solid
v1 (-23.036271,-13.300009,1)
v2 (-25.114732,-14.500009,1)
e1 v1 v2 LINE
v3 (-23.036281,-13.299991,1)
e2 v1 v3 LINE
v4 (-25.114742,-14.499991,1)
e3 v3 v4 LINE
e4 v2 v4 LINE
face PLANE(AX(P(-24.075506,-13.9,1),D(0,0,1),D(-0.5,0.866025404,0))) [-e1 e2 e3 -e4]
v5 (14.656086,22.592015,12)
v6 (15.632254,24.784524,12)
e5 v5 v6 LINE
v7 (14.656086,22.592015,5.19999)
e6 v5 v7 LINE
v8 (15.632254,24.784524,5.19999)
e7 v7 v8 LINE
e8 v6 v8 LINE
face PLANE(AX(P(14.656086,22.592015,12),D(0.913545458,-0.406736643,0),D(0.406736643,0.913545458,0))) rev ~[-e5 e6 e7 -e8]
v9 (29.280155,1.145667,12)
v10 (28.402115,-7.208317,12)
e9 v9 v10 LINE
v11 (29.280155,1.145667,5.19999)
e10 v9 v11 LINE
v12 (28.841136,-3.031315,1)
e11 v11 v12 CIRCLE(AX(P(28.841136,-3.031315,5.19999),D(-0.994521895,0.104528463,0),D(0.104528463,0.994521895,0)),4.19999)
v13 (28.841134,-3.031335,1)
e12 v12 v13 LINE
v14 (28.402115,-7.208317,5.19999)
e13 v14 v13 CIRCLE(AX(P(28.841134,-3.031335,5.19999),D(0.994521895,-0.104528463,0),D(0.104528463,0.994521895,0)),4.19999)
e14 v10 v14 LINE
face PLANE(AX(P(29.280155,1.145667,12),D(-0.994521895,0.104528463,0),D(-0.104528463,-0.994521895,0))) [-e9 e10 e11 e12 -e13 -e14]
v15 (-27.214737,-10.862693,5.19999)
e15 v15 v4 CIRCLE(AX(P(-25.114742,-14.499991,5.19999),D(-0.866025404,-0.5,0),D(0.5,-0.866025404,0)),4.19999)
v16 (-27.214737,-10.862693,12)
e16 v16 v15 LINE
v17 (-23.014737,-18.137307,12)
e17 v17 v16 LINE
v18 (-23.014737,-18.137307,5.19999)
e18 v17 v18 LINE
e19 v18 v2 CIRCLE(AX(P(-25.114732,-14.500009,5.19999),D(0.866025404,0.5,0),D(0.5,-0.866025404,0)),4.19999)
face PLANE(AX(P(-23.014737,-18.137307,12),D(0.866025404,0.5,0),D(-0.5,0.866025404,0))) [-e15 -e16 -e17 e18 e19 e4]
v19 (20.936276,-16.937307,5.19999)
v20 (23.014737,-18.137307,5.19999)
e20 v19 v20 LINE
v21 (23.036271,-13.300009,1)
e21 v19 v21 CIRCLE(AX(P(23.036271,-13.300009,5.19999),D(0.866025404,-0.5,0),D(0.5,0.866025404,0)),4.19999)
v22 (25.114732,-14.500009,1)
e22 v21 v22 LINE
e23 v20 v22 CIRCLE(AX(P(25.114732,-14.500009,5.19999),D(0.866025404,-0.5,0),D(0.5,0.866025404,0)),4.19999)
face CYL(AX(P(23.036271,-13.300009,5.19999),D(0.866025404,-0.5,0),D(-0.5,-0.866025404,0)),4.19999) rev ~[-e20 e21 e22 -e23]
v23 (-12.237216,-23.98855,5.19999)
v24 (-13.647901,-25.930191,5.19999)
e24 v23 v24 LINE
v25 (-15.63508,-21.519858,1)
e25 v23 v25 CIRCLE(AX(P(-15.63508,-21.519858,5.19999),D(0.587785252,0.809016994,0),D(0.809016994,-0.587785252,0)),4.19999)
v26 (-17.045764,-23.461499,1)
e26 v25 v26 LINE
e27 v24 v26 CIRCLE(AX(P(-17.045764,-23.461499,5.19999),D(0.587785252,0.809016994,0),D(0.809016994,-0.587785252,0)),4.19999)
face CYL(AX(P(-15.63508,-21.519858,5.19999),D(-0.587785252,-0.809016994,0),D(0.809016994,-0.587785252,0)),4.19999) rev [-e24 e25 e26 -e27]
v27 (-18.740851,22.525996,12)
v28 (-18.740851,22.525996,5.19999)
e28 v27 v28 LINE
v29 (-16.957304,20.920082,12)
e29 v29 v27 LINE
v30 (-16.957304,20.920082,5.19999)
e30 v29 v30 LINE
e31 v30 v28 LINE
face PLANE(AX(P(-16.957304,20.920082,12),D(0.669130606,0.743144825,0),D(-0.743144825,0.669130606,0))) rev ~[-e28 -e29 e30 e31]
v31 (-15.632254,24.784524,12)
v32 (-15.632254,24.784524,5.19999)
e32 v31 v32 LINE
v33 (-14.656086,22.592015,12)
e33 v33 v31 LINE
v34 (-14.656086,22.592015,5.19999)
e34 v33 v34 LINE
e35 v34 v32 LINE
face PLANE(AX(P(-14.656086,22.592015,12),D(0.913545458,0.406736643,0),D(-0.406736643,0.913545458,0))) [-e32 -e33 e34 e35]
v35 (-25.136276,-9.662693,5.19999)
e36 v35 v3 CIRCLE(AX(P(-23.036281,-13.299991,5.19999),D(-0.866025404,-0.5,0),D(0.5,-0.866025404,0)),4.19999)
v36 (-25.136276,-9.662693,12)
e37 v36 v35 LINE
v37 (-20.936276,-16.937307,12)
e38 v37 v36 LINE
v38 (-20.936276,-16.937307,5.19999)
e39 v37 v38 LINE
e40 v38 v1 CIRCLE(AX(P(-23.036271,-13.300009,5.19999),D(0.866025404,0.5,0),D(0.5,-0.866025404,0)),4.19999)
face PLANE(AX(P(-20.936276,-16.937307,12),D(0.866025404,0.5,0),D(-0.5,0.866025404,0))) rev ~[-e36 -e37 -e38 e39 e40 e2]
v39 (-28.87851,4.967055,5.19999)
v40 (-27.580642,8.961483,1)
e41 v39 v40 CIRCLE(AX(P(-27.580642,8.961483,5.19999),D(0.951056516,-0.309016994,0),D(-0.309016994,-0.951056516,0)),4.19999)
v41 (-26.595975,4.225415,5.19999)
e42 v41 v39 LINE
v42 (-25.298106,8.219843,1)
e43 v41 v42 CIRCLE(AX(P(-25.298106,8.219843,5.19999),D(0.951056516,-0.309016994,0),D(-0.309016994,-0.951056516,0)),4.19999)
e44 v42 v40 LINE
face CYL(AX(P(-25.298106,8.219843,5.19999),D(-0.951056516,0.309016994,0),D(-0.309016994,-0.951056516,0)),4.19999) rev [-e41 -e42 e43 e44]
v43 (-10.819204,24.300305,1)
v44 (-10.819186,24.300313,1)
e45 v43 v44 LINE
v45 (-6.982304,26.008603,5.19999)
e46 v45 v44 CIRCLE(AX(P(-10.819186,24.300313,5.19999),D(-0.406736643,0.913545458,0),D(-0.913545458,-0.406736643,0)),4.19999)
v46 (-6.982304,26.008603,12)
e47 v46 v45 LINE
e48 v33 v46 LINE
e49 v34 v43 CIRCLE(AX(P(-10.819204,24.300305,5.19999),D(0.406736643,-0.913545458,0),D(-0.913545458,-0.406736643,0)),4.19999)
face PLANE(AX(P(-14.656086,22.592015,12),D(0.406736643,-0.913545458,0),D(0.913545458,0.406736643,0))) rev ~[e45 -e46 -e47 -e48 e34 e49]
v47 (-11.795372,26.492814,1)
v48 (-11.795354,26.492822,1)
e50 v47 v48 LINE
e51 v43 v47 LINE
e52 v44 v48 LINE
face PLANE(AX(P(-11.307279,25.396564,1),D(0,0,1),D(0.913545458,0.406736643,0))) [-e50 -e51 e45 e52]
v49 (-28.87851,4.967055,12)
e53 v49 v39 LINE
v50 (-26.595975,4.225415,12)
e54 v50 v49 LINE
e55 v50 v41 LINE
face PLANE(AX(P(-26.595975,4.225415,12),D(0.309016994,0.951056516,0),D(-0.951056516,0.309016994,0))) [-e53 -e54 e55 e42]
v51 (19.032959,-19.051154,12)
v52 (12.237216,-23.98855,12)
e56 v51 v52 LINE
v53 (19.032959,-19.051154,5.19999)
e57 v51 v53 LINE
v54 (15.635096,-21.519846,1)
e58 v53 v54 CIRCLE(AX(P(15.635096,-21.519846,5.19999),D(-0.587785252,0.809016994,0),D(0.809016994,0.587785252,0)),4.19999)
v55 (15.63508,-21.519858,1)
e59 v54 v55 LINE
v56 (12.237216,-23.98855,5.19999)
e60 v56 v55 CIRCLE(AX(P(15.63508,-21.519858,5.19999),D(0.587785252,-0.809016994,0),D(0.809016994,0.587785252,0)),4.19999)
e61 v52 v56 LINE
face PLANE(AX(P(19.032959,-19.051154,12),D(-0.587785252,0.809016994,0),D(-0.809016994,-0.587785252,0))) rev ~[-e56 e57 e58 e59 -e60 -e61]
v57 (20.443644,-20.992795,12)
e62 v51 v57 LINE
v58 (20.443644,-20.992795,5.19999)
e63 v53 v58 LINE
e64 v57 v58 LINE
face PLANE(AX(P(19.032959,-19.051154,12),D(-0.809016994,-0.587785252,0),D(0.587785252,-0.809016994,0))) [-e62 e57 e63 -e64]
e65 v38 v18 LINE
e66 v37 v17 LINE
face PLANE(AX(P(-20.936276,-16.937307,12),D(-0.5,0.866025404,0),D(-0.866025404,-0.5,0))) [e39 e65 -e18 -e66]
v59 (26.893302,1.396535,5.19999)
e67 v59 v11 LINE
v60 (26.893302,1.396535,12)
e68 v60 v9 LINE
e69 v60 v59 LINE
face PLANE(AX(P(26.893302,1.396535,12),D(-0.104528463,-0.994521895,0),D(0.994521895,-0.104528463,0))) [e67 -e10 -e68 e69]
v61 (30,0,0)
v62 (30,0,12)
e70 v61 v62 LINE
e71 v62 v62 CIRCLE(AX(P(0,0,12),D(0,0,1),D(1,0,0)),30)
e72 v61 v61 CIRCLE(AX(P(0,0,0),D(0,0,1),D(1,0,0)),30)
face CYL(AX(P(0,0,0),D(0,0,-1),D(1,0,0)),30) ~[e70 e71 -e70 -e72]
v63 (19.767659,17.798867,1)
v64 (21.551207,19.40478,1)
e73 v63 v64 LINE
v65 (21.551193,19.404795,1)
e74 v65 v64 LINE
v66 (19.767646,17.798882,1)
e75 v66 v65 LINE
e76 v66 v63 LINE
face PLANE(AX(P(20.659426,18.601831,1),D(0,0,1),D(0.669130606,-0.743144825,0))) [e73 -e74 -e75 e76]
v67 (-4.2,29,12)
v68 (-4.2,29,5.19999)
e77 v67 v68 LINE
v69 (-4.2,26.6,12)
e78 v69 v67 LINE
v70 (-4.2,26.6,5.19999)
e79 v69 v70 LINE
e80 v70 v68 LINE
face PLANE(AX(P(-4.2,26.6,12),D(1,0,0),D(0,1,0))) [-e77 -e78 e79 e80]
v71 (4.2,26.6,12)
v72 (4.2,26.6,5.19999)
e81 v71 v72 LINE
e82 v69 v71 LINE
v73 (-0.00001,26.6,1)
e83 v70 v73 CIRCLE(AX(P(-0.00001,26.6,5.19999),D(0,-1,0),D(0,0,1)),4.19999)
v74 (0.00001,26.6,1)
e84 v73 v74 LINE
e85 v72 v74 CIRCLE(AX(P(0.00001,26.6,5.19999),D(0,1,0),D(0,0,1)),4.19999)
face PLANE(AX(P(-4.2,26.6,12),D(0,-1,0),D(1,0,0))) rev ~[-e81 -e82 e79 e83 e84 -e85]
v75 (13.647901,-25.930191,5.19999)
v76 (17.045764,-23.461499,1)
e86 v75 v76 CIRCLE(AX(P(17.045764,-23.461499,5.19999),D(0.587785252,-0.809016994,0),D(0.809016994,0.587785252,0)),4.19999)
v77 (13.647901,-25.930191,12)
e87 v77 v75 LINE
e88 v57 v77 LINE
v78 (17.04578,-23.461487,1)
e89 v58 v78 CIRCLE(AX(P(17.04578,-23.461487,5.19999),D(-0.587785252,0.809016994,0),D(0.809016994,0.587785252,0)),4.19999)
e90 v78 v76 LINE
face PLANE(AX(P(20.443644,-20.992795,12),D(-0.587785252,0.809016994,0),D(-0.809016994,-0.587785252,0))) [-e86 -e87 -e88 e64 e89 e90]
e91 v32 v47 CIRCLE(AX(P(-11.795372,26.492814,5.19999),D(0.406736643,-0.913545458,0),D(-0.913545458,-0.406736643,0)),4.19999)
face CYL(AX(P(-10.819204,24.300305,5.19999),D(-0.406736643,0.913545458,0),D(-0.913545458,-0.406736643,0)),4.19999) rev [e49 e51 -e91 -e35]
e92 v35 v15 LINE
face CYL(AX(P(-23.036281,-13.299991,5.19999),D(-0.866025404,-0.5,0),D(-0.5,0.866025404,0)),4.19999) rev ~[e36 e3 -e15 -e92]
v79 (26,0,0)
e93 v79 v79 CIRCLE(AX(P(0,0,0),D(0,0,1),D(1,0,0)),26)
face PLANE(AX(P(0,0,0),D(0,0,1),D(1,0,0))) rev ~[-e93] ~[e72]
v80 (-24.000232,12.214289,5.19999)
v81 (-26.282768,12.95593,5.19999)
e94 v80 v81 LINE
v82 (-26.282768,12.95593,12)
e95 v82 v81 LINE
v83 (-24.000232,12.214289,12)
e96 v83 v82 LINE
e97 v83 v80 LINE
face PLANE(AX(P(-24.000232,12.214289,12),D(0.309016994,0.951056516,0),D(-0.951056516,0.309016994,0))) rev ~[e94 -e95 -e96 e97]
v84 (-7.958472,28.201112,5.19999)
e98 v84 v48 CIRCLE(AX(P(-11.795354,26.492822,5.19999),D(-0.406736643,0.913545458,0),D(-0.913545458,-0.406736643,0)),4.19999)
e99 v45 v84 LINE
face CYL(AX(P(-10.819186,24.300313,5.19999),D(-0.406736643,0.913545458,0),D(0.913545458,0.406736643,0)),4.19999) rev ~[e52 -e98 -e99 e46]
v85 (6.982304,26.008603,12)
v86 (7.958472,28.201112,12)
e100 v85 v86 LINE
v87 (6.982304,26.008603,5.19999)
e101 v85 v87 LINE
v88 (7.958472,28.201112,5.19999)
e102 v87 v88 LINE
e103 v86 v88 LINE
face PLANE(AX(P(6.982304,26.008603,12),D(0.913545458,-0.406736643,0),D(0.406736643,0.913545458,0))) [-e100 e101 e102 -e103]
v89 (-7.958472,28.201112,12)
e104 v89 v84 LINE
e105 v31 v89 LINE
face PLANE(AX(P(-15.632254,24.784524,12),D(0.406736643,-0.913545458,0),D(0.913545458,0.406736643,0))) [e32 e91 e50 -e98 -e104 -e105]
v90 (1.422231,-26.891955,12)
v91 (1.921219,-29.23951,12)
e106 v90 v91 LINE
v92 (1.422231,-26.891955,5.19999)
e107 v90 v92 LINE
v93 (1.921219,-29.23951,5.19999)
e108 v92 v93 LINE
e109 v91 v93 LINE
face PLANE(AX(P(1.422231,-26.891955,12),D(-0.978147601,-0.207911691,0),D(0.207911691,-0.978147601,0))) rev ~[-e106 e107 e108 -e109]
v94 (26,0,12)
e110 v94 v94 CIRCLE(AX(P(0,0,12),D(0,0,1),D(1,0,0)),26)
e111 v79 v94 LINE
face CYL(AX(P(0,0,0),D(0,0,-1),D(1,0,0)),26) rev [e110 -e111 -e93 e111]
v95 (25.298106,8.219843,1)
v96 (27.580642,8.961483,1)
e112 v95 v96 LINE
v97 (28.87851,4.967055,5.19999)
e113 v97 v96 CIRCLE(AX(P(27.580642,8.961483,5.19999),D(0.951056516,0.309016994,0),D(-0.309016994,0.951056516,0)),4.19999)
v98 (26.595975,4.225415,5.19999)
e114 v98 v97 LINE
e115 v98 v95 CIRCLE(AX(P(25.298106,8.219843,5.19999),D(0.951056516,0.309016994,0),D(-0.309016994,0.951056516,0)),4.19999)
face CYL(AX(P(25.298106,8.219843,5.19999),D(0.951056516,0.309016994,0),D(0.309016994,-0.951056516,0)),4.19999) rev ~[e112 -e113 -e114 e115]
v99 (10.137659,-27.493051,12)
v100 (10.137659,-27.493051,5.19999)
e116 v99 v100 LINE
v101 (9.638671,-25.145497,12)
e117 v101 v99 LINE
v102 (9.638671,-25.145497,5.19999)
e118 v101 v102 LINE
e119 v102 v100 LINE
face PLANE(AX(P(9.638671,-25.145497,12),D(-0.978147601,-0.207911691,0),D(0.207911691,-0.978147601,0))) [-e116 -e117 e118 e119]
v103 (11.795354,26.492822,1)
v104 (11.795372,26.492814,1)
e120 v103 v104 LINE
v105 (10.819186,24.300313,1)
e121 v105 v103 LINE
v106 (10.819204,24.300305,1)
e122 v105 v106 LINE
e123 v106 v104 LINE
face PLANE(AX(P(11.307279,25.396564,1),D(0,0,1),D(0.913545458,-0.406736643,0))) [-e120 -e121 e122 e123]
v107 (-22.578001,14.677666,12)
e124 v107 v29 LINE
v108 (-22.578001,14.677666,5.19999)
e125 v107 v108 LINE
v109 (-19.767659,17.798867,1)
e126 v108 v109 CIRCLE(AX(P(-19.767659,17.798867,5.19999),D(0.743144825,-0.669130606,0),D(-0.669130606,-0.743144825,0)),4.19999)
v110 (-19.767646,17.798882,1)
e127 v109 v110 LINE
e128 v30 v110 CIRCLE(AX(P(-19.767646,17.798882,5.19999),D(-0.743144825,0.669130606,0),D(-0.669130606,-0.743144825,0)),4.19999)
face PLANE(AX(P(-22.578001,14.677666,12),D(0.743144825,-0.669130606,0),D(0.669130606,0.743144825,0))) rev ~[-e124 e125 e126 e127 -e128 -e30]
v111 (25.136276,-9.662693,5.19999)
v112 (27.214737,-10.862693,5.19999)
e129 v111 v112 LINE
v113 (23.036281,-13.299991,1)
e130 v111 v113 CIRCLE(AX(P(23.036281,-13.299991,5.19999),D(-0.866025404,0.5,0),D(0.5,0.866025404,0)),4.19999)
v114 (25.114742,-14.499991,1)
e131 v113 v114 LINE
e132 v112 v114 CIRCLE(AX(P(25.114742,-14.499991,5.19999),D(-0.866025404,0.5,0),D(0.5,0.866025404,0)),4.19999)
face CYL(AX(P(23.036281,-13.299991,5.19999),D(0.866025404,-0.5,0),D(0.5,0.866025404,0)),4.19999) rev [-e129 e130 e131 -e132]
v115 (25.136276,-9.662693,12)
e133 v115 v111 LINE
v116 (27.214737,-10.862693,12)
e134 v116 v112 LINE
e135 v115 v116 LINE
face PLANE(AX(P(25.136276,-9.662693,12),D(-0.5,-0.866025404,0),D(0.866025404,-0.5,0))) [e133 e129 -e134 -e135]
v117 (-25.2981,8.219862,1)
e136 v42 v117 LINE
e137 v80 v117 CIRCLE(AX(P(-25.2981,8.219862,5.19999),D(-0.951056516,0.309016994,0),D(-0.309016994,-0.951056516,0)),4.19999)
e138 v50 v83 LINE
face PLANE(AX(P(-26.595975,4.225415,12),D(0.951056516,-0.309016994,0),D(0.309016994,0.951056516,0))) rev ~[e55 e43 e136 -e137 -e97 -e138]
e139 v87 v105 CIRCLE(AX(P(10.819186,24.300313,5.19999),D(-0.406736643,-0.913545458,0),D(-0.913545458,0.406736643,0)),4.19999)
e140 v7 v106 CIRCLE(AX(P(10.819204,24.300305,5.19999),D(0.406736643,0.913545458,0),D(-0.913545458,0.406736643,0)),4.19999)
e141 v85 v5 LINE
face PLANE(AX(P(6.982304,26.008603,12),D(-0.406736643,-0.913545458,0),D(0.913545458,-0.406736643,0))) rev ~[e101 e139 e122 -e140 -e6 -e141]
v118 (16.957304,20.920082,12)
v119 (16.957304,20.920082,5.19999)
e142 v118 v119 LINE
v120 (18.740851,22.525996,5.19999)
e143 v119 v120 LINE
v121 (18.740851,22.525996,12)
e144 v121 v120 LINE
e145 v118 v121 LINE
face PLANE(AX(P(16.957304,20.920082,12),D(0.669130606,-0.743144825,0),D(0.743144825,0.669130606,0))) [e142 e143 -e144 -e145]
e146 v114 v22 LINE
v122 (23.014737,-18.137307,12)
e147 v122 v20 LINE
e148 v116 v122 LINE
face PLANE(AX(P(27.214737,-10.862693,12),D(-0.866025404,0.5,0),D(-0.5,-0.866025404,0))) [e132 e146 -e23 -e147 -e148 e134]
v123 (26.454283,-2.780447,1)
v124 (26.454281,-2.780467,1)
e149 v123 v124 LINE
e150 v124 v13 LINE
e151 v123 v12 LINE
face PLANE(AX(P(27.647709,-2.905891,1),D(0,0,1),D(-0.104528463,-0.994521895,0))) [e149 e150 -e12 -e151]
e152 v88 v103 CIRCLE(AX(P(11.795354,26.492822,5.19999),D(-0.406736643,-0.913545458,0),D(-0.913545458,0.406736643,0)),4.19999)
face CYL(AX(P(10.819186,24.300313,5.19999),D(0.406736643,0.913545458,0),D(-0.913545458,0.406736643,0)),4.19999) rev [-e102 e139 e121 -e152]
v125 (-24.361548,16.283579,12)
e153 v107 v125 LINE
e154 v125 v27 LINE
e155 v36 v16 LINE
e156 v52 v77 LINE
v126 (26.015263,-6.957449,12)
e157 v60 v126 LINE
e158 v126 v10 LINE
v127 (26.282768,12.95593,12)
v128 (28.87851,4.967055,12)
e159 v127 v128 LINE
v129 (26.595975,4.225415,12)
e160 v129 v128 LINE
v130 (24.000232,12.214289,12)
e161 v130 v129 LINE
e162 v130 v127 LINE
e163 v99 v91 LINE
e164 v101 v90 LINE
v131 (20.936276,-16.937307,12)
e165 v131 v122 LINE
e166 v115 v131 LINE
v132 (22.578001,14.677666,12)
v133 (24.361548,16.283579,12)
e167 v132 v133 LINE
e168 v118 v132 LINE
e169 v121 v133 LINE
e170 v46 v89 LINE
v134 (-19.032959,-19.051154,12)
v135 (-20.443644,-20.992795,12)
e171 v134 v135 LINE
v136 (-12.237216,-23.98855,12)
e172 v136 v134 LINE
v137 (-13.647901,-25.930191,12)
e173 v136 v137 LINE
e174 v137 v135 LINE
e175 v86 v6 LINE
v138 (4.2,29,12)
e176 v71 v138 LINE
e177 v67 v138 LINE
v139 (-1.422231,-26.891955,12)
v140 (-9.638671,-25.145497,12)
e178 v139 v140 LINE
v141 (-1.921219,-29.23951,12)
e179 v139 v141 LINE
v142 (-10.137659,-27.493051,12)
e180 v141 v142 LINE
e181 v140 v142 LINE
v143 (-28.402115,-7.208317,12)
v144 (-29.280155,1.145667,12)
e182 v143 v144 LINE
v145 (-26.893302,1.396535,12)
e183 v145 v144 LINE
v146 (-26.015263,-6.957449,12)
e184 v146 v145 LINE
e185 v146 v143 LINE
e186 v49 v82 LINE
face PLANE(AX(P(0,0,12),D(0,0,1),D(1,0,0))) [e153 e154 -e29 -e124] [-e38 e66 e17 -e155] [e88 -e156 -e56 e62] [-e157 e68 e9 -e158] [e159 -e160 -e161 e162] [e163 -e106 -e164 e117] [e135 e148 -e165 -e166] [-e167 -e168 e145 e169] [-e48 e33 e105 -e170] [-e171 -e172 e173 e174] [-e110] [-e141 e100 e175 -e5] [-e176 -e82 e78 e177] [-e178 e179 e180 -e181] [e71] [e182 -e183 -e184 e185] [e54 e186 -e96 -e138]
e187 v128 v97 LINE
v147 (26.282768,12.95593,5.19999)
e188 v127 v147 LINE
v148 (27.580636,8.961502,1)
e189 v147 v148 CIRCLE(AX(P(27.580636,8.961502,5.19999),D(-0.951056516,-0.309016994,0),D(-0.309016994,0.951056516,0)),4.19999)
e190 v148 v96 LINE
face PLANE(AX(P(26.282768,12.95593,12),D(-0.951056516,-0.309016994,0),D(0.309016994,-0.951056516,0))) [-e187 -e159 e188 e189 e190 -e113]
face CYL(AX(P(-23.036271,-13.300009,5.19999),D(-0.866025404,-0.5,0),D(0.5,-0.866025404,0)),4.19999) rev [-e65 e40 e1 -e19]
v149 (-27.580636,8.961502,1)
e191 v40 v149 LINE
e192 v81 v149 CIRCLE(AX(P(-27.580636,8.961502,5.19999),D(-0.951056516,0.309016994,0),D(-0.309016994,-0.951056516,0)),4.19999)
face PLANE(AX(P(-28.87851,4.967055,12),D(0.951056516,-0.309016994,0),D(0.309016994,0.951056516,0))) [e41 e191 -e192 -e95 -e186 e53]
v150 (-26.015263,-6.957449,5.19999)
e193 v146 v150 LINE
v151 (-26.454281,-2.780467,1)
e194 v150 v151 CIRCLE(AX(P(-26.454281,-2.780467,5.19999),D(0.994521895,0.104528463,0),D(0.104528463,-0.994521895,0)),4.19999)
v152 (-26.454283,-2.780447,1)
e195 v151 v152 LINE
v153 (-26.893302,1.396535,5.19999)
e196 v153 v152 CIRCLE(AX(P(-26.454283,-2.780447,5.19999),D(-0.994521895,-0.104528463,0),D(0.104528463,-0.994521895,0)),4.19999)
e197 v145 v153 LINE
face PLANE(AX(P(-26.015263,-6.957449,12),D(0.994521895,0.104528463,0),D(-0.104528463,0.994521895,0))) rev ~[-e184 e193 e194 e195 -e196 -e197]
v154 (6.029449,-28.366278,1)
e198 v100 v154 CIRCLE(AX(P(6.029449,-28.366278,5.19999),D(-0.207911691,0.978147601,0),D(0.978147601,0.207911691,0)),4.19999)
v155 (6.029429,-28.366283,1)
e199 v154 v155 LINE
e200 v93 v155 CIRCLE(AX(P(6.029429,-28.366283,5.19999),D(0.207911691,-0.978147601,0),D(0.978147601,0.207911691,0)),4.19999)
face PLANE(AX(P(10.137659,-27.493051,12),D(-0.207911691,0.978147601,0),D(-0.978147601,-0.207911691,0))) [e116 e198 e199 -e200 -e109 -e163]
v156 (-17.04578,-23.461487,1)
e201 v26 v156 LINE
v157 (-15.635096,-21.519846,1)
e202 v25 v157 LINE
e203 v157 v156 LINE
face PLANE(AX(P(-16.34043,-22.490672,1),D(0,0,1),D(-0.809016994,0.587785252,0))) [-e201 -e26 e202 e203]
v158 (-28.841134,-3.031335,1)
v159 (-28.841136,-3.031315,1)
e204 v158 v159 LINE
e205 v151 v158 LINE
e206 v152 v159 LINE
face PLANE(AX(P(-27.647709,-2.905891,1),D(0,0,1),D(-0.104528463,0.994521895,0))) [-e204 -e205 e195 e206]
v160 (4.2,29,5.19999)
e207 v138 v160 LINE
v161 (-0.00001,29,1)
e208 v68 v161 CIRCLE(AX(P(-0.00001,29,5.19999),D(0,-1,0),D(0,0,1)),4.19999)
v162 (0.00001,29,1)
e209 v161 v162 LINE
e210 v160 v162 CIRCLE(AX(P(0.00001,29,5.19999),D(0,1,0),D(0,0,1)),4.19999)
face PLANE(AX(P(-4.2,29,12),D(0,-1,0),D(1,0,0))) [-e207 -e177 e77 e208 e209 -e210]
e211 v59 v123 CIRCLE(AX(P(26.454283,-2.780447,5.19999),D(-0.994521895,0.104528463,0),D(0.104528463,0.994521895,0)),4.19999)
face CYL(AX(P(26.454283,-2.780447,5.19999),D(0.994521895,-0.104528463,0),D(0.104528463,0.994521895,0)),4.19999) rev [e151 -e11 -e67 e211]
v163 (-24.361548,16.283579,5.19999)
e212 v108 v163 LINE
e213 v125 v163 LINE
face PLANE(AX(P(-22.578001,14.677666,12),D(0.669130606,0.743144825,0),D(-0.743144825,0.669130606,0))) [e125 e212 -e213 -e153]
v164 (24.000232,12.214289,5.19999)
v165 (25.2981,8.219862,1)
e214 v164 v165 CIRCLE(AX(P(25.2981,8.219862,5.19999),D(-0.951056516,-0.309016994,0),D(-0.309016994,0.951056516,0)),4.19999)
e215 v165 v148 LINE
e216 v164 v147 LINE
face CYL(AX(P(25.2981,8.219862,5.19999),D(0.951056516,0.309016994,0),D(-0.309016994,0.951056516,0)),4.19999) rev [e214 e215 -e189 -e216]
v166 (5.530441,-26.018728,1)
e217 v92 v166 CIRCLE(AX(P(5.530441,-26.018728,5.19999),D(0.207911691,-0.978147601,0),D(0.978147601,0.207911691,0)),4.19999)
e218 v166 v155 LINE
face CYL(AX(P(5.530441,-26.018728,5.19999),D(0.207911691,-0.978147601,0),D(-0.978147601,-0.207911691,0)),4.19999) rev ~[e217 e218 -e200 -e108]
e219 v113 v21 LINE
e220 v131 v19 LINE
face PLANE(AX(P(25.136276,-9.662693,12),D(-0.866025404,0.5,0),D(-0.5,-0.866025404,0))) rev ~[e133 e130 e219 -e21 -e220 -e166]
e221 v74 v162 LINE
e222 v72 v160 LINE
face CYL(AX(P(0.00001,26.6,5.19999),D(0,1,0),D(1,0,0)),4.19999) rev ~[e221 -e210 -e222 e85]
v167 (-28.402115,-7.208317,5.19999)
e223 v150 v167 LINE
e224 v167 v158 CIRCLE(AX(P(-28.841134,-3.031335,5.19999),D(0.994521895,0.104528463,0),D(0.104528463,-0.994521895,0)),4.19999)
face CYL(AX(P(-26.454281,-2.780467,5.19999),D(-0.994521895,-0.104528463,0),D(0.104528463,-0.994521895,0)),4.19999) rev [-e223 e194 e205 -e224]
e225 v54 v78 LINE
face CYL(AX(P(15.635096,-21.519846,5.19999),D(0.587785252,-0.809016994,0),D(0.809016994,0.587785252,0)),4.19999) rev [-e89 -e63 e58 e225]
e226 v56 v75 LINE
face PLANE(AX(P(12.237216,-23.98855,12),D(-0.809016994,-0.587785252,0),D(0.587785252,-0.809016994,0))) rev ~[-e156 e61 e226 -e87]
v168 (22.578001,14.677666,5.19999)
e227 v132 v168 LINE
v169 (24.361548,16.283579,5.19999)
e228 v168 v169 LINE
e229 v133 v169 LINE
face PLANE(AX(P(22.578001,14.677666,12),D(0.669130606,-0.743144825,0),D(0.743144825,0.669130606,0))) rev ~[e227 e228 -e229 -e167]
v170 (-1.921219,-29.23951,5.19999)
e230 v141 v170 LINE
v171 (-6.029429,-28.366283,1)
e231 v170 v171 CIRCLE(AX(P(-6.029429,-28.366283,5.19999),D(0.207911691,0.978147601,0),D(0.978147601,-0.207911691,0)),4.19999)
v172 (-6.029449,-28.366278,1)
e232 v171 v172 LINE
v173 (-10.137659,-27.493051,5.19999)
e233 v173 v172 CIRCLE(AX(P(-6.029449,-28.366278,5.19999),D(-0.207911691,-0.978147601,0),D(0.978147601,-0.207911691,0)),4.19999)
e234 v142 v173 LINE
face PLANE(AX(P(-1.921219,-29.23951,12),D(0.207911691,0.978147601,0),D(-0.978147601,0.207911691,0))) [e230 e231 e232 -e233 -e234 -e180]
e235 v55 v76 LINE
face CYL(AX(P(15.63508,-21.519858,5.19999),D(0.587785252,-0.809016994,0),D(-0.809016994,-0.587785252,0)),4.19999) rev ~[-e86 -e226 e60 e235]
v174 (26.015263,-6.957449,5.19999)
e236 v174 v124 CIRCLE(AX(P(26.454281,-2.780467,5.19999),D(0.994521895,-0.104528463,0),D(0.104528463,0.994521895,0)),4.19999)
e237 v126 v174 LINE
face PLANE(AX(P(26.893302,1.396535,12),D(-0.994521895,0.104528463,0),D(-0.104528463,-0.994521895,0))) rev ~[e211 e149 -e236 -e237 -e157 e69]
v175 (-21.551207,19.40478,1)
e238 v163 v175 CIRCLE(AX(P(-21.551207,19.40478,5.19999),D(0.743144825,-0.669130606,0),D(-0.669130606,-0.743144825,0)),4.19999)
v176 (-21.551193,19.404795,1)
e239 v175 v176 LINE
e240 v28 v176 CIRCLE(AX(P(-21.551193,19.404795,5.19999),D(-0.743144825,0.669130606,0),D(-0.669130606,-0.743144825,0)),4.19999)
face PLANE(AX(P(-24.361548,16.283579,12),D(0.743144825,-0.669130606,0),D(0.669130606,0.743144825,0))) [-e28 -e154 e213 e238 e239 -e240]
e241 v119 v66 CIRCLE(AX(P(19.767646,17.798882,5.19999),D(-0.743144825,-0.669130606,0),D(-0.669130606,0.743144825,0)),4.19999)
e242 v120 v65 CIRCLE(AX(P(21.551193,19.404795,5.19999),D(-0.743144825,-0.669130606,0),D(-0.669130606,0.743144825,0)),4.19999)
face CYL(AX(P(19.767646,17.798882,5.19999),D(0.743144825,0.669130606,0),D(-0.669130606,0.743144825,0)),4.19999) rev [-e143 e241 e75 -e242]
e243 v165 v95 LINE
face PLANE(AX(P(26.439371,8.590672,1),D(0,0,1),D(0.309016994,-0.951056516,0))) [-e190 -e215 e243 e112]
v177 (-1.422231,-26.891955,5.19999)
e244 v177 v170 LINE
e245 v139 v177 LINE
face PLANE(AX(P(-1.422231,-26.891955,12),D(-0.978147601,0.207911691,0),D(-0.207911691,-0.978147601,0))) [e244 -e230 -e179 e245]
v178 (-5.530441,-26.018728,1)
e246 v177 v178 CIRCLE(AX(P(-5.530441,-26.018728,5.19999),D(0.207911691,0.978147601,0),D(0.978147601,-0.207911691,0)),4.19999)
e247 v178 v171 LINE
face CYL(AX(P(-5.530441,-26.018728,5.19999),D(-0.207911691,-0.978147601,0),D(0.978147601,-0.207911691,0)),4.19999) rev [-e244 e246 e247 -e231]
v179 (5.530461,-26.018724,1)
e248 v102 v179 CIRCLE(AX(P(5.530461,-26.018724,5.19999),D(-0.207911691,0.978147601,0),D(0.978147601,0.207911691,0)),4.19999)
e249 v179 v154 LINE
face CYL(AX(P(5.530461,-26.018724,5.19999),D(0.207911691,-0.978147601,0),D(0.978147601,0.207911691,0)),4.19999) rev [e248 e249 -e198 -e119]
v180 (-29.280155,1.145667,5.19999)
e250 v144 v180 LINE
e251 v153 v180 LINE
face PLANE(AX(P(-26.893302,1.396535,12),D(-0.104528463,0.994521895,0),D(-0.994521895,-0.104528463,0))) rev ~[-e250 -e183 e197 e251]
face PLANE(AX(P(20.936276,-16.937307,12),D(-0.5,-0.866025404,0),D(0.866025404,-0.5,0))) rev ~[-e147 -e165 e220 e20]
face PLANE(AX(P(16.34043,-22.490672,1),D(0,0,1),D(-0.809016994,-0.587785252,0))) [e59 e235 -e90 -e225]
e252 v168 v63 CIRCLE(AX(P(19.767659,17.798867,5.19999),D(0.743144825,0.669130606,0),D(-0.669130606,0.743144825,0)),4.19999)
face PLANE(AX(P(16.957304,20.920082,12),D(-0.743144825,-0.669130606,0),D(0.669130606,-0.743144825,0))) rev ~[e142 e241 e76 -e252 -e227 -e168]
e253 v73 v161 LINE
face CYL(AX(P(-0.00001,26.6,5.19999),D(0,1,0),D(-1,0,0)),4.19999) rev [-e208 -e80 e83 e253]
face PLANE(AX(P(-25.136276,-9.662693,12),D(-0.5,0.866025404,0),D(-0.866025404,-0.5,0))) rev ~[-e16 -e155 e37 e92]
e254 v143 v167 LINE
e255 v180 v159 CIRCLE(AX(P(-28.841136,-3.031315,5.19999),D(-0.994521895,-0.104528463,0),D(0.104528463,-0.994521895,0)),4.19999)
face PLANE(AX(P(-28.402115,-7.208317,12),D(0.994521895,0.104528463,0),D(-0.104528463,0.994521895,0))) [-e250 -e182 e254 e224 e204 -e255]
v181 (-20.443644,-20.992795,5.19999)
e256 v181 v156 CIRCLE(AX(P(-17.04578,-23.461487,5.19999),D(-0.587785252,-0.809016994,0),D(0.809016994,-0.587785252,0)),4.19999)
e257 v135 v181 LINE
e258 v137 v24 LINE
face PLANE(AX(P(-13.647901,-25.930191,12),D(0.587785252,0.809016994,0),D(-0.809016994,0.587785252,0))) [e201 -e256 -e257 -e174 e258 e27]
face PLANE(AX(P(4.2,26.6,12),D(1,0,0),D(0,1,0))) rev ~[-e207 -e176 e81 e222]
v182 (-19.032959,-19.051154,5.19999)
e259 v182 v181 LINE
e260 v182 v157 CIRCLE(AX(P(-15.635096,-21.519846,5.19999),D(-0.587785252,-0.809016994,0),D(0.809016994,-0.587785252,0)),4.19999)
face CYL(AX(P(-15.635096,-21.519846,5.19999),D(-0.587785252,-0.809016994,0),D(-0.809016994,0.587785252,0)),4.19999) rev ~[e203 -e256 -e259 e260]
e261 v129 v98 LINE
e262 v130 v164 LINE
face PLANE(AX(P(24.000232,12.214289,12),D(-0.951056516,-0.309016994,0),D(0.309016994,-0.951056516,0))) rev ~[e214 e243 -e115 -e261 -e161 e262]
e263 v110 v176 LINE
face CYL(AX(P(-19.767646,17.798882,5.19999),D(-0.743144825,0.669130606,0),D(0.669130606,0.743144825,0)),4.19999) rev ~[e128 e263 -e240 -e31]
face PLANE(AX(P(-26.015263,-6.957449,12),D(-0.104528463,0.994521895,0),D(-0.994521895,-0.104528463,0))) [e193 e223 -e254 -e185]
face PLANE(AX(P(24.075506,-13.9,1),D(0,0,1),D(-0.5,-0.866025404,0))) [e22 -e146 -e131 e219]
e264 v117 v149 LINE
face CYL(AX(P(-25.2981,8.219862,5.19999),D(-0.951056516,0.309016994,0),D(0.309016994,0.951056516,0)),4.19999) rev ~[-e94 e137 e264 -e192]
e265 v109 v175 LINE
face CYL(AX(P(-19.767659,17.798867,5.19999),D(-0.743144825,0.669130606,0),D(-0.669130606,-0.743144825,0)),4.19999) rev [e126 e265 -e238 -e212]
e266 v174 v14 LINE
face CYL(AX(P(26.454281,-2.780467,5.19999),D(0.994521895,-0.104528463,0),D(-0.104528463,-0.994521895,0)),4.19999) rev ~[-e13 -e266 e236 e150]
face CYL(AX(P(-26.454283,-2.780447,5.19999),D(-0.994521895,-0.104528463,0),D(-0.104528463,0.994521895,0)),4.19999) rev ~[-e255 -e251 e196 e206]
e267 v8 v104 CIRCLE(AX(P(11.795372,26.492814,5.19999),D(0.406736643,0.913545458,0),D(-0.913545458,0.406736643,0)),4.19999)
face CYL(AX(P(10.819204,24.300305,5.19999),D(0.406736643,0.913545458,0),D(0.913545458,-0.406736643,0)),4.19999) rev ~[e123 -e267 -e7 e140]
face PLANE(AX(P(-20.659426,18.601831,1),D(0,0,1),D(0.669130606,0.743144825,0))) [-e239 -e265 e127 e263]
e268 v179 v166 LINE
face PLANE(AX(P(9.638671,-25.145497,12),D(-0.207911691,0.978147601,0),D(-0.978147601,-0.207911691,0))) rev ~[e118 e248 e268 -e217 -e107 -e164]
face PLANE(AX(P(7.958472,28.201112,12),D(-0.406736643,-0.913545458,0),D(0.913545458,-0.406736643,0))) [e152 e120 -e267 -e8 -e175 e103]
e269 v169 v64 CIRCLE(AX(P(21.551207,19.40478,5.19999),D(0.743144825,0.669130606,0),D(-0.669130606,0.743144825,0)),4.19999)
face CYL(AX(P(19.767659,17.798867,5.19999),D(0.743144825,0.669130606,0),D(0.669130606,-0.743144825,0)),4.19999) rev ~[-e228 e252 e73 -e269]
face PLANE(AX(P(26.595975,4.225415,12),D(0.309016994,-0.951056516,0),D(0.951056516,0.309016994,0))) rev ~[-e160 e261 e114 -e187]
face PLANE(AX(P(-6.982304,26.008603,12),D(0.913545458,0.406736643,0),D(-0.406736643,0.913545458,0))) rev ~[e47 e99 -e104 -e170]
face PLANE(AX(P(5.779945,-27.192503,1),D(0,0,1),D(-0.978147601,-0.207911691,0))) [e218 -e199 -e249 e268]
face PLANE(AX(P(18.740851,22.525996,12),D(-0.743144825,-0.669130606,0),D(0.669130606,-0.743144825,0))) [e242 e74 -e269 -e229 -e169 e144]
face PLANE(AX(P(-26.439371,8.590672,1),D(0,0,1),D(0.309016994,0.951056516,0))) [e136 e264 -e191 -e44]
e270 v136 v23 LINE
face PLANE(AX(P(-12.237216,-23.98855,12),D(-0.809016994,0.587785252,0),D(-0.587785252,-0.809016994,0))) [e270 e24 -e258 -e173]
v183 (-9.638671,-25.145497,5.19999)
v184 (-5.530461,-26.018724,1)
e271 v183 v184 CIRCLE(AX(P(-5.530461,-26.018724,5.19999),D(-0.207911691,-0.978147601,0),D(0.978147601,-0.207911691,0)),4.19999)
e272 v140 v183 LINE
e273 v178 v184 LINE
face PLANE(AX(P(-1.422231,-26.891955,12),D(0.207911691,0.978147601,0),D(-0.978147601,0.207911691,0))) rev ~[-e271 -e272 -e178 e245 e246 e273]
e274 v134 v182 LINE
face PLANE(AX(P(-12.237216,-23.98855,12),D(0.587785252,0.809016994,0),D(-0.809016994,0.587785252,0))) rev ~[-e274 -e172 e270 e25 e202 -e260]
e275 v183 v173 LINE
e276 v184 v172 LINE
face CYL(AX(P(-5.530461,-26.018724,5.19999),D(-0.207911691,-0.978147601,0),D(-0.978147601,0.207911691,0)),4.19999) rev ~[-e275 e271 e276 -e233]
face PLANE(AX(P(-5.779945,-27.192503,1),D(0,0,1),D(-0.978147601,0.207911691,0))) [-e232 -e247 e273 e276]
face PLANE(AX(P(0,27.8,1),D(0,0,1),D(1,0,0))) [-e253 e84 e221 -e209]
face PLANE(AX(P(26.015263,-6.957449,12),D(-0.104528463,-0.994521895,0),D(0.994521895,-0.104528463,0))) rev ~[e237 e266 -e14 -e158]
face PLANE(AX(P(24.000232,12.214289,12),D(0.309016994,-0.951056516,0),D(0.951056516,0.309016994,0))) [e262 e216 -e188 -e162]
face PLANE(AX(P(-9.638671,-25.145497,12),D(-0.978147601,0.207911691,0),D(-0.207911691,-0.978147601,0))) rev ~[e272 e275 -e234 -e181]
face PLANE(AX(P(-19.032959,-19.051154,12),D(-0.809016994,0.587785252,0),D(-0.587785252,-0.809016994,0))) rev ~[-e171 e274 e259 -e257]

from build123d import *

# Parameters (mm, degrees)
F0_R            = 30
F0_R_2          = 26
F1_DEPTH        = 12
F2_W            = 8.4
F2_H            = 2.4
F3_DEPTH        = 11
F3_COPIES_COUNT = 15
F4_R            = 4.19999


# Not quite as in the source:
# - a fillet or chamfer is up to 0.001 mm smaller than in the source, because OpenCascade refuses the exact size
# - a pattern or mirror of a feature is missing from the dataset's text; its kind, count and spacing are read off the source's solid


with BuildPart() as f1:
    # F0 (on Top) → F1 (new body)
    with BuildSketch(Plane.XY):
        Circle(F0_R)
        Circle(F0_R_2, mode=Mode.SUBTRACT)
    extrude(amount=F1_DEPTH)

    # F2 (on face) → F3 (cut)
    with BuildSketch(Plane.XY.offset(12)):
        with Locations((0, 27.8)):
            Rectangle(F2_W, F2_H)
    f3 = extrude(amount=-F3_DEPTH, mode=Mode.SUBTRACT)

    # F3_copies: F3 ×15 about axis
    f3_copies_axis = Axis((0, 0, 0), (0, 0, 1))
    for i in range(1, F3_COPIES_COUNT):
        add(f3.rotate(f3_copies_axis, i * 360 / F3_COPIES_COUNT), mode=Mode.SUBTRACT)

    # F4 (radius 4.2 in the source; OpenCascade refuses exactly that, so slightly less here)
    f4_edges = [f1.edges().sort_by_distance(p)[0] for p in [
        (-4.2, 27.8, 1),
        (4.2, 27.8, 1),
        (-12.942559, -24.959371, 1),
        (-19.738301, -20.021974, 1),
        (-1.671725, -28.065732, 1),
        (-9.888165, -26.319274, 1),
        (-21.975506, -17.537307, 1),
        (-26.175506, -10.262693, 1),
        (-27.208689, -7.082883, 1),
        (-28.086728, 1.271101, 1),
        (9.888165, -26.319274, 1),
        (1.671725, -28.065732, 1),
        (19.738301, -20.021974, 1),
        (12.942559, -24.959371, 1),
        (26.175506, -10.262693, 1),
        (21.975506, -17.537307, 1),
        (28.086728, 1.271101, 1),
        (27.208689, -7.082883, 1),
        (-27.737243, 4.596235, 1),
        (-25.1415, 12.58511, 1),
        (-23.469775, 15.480623, 1),
        (-17.849078, 21.723039, 1),
        (-15.14417, 23.68827, 1),
        (-7.470388, 27.104858, 1),
        (25.1415, 12.58511, 1),
        (27.737243, 4.596235, 1),
        (15.14417, 23.68827, 1),
        (7.470388, 27.104858, 1),
        (17.849078, 21.723039, 1),
        (23.469775, 15.480623, 1),
    ]]
    fillet(f4_edges, radius=F4_R)


solid = f1.part
